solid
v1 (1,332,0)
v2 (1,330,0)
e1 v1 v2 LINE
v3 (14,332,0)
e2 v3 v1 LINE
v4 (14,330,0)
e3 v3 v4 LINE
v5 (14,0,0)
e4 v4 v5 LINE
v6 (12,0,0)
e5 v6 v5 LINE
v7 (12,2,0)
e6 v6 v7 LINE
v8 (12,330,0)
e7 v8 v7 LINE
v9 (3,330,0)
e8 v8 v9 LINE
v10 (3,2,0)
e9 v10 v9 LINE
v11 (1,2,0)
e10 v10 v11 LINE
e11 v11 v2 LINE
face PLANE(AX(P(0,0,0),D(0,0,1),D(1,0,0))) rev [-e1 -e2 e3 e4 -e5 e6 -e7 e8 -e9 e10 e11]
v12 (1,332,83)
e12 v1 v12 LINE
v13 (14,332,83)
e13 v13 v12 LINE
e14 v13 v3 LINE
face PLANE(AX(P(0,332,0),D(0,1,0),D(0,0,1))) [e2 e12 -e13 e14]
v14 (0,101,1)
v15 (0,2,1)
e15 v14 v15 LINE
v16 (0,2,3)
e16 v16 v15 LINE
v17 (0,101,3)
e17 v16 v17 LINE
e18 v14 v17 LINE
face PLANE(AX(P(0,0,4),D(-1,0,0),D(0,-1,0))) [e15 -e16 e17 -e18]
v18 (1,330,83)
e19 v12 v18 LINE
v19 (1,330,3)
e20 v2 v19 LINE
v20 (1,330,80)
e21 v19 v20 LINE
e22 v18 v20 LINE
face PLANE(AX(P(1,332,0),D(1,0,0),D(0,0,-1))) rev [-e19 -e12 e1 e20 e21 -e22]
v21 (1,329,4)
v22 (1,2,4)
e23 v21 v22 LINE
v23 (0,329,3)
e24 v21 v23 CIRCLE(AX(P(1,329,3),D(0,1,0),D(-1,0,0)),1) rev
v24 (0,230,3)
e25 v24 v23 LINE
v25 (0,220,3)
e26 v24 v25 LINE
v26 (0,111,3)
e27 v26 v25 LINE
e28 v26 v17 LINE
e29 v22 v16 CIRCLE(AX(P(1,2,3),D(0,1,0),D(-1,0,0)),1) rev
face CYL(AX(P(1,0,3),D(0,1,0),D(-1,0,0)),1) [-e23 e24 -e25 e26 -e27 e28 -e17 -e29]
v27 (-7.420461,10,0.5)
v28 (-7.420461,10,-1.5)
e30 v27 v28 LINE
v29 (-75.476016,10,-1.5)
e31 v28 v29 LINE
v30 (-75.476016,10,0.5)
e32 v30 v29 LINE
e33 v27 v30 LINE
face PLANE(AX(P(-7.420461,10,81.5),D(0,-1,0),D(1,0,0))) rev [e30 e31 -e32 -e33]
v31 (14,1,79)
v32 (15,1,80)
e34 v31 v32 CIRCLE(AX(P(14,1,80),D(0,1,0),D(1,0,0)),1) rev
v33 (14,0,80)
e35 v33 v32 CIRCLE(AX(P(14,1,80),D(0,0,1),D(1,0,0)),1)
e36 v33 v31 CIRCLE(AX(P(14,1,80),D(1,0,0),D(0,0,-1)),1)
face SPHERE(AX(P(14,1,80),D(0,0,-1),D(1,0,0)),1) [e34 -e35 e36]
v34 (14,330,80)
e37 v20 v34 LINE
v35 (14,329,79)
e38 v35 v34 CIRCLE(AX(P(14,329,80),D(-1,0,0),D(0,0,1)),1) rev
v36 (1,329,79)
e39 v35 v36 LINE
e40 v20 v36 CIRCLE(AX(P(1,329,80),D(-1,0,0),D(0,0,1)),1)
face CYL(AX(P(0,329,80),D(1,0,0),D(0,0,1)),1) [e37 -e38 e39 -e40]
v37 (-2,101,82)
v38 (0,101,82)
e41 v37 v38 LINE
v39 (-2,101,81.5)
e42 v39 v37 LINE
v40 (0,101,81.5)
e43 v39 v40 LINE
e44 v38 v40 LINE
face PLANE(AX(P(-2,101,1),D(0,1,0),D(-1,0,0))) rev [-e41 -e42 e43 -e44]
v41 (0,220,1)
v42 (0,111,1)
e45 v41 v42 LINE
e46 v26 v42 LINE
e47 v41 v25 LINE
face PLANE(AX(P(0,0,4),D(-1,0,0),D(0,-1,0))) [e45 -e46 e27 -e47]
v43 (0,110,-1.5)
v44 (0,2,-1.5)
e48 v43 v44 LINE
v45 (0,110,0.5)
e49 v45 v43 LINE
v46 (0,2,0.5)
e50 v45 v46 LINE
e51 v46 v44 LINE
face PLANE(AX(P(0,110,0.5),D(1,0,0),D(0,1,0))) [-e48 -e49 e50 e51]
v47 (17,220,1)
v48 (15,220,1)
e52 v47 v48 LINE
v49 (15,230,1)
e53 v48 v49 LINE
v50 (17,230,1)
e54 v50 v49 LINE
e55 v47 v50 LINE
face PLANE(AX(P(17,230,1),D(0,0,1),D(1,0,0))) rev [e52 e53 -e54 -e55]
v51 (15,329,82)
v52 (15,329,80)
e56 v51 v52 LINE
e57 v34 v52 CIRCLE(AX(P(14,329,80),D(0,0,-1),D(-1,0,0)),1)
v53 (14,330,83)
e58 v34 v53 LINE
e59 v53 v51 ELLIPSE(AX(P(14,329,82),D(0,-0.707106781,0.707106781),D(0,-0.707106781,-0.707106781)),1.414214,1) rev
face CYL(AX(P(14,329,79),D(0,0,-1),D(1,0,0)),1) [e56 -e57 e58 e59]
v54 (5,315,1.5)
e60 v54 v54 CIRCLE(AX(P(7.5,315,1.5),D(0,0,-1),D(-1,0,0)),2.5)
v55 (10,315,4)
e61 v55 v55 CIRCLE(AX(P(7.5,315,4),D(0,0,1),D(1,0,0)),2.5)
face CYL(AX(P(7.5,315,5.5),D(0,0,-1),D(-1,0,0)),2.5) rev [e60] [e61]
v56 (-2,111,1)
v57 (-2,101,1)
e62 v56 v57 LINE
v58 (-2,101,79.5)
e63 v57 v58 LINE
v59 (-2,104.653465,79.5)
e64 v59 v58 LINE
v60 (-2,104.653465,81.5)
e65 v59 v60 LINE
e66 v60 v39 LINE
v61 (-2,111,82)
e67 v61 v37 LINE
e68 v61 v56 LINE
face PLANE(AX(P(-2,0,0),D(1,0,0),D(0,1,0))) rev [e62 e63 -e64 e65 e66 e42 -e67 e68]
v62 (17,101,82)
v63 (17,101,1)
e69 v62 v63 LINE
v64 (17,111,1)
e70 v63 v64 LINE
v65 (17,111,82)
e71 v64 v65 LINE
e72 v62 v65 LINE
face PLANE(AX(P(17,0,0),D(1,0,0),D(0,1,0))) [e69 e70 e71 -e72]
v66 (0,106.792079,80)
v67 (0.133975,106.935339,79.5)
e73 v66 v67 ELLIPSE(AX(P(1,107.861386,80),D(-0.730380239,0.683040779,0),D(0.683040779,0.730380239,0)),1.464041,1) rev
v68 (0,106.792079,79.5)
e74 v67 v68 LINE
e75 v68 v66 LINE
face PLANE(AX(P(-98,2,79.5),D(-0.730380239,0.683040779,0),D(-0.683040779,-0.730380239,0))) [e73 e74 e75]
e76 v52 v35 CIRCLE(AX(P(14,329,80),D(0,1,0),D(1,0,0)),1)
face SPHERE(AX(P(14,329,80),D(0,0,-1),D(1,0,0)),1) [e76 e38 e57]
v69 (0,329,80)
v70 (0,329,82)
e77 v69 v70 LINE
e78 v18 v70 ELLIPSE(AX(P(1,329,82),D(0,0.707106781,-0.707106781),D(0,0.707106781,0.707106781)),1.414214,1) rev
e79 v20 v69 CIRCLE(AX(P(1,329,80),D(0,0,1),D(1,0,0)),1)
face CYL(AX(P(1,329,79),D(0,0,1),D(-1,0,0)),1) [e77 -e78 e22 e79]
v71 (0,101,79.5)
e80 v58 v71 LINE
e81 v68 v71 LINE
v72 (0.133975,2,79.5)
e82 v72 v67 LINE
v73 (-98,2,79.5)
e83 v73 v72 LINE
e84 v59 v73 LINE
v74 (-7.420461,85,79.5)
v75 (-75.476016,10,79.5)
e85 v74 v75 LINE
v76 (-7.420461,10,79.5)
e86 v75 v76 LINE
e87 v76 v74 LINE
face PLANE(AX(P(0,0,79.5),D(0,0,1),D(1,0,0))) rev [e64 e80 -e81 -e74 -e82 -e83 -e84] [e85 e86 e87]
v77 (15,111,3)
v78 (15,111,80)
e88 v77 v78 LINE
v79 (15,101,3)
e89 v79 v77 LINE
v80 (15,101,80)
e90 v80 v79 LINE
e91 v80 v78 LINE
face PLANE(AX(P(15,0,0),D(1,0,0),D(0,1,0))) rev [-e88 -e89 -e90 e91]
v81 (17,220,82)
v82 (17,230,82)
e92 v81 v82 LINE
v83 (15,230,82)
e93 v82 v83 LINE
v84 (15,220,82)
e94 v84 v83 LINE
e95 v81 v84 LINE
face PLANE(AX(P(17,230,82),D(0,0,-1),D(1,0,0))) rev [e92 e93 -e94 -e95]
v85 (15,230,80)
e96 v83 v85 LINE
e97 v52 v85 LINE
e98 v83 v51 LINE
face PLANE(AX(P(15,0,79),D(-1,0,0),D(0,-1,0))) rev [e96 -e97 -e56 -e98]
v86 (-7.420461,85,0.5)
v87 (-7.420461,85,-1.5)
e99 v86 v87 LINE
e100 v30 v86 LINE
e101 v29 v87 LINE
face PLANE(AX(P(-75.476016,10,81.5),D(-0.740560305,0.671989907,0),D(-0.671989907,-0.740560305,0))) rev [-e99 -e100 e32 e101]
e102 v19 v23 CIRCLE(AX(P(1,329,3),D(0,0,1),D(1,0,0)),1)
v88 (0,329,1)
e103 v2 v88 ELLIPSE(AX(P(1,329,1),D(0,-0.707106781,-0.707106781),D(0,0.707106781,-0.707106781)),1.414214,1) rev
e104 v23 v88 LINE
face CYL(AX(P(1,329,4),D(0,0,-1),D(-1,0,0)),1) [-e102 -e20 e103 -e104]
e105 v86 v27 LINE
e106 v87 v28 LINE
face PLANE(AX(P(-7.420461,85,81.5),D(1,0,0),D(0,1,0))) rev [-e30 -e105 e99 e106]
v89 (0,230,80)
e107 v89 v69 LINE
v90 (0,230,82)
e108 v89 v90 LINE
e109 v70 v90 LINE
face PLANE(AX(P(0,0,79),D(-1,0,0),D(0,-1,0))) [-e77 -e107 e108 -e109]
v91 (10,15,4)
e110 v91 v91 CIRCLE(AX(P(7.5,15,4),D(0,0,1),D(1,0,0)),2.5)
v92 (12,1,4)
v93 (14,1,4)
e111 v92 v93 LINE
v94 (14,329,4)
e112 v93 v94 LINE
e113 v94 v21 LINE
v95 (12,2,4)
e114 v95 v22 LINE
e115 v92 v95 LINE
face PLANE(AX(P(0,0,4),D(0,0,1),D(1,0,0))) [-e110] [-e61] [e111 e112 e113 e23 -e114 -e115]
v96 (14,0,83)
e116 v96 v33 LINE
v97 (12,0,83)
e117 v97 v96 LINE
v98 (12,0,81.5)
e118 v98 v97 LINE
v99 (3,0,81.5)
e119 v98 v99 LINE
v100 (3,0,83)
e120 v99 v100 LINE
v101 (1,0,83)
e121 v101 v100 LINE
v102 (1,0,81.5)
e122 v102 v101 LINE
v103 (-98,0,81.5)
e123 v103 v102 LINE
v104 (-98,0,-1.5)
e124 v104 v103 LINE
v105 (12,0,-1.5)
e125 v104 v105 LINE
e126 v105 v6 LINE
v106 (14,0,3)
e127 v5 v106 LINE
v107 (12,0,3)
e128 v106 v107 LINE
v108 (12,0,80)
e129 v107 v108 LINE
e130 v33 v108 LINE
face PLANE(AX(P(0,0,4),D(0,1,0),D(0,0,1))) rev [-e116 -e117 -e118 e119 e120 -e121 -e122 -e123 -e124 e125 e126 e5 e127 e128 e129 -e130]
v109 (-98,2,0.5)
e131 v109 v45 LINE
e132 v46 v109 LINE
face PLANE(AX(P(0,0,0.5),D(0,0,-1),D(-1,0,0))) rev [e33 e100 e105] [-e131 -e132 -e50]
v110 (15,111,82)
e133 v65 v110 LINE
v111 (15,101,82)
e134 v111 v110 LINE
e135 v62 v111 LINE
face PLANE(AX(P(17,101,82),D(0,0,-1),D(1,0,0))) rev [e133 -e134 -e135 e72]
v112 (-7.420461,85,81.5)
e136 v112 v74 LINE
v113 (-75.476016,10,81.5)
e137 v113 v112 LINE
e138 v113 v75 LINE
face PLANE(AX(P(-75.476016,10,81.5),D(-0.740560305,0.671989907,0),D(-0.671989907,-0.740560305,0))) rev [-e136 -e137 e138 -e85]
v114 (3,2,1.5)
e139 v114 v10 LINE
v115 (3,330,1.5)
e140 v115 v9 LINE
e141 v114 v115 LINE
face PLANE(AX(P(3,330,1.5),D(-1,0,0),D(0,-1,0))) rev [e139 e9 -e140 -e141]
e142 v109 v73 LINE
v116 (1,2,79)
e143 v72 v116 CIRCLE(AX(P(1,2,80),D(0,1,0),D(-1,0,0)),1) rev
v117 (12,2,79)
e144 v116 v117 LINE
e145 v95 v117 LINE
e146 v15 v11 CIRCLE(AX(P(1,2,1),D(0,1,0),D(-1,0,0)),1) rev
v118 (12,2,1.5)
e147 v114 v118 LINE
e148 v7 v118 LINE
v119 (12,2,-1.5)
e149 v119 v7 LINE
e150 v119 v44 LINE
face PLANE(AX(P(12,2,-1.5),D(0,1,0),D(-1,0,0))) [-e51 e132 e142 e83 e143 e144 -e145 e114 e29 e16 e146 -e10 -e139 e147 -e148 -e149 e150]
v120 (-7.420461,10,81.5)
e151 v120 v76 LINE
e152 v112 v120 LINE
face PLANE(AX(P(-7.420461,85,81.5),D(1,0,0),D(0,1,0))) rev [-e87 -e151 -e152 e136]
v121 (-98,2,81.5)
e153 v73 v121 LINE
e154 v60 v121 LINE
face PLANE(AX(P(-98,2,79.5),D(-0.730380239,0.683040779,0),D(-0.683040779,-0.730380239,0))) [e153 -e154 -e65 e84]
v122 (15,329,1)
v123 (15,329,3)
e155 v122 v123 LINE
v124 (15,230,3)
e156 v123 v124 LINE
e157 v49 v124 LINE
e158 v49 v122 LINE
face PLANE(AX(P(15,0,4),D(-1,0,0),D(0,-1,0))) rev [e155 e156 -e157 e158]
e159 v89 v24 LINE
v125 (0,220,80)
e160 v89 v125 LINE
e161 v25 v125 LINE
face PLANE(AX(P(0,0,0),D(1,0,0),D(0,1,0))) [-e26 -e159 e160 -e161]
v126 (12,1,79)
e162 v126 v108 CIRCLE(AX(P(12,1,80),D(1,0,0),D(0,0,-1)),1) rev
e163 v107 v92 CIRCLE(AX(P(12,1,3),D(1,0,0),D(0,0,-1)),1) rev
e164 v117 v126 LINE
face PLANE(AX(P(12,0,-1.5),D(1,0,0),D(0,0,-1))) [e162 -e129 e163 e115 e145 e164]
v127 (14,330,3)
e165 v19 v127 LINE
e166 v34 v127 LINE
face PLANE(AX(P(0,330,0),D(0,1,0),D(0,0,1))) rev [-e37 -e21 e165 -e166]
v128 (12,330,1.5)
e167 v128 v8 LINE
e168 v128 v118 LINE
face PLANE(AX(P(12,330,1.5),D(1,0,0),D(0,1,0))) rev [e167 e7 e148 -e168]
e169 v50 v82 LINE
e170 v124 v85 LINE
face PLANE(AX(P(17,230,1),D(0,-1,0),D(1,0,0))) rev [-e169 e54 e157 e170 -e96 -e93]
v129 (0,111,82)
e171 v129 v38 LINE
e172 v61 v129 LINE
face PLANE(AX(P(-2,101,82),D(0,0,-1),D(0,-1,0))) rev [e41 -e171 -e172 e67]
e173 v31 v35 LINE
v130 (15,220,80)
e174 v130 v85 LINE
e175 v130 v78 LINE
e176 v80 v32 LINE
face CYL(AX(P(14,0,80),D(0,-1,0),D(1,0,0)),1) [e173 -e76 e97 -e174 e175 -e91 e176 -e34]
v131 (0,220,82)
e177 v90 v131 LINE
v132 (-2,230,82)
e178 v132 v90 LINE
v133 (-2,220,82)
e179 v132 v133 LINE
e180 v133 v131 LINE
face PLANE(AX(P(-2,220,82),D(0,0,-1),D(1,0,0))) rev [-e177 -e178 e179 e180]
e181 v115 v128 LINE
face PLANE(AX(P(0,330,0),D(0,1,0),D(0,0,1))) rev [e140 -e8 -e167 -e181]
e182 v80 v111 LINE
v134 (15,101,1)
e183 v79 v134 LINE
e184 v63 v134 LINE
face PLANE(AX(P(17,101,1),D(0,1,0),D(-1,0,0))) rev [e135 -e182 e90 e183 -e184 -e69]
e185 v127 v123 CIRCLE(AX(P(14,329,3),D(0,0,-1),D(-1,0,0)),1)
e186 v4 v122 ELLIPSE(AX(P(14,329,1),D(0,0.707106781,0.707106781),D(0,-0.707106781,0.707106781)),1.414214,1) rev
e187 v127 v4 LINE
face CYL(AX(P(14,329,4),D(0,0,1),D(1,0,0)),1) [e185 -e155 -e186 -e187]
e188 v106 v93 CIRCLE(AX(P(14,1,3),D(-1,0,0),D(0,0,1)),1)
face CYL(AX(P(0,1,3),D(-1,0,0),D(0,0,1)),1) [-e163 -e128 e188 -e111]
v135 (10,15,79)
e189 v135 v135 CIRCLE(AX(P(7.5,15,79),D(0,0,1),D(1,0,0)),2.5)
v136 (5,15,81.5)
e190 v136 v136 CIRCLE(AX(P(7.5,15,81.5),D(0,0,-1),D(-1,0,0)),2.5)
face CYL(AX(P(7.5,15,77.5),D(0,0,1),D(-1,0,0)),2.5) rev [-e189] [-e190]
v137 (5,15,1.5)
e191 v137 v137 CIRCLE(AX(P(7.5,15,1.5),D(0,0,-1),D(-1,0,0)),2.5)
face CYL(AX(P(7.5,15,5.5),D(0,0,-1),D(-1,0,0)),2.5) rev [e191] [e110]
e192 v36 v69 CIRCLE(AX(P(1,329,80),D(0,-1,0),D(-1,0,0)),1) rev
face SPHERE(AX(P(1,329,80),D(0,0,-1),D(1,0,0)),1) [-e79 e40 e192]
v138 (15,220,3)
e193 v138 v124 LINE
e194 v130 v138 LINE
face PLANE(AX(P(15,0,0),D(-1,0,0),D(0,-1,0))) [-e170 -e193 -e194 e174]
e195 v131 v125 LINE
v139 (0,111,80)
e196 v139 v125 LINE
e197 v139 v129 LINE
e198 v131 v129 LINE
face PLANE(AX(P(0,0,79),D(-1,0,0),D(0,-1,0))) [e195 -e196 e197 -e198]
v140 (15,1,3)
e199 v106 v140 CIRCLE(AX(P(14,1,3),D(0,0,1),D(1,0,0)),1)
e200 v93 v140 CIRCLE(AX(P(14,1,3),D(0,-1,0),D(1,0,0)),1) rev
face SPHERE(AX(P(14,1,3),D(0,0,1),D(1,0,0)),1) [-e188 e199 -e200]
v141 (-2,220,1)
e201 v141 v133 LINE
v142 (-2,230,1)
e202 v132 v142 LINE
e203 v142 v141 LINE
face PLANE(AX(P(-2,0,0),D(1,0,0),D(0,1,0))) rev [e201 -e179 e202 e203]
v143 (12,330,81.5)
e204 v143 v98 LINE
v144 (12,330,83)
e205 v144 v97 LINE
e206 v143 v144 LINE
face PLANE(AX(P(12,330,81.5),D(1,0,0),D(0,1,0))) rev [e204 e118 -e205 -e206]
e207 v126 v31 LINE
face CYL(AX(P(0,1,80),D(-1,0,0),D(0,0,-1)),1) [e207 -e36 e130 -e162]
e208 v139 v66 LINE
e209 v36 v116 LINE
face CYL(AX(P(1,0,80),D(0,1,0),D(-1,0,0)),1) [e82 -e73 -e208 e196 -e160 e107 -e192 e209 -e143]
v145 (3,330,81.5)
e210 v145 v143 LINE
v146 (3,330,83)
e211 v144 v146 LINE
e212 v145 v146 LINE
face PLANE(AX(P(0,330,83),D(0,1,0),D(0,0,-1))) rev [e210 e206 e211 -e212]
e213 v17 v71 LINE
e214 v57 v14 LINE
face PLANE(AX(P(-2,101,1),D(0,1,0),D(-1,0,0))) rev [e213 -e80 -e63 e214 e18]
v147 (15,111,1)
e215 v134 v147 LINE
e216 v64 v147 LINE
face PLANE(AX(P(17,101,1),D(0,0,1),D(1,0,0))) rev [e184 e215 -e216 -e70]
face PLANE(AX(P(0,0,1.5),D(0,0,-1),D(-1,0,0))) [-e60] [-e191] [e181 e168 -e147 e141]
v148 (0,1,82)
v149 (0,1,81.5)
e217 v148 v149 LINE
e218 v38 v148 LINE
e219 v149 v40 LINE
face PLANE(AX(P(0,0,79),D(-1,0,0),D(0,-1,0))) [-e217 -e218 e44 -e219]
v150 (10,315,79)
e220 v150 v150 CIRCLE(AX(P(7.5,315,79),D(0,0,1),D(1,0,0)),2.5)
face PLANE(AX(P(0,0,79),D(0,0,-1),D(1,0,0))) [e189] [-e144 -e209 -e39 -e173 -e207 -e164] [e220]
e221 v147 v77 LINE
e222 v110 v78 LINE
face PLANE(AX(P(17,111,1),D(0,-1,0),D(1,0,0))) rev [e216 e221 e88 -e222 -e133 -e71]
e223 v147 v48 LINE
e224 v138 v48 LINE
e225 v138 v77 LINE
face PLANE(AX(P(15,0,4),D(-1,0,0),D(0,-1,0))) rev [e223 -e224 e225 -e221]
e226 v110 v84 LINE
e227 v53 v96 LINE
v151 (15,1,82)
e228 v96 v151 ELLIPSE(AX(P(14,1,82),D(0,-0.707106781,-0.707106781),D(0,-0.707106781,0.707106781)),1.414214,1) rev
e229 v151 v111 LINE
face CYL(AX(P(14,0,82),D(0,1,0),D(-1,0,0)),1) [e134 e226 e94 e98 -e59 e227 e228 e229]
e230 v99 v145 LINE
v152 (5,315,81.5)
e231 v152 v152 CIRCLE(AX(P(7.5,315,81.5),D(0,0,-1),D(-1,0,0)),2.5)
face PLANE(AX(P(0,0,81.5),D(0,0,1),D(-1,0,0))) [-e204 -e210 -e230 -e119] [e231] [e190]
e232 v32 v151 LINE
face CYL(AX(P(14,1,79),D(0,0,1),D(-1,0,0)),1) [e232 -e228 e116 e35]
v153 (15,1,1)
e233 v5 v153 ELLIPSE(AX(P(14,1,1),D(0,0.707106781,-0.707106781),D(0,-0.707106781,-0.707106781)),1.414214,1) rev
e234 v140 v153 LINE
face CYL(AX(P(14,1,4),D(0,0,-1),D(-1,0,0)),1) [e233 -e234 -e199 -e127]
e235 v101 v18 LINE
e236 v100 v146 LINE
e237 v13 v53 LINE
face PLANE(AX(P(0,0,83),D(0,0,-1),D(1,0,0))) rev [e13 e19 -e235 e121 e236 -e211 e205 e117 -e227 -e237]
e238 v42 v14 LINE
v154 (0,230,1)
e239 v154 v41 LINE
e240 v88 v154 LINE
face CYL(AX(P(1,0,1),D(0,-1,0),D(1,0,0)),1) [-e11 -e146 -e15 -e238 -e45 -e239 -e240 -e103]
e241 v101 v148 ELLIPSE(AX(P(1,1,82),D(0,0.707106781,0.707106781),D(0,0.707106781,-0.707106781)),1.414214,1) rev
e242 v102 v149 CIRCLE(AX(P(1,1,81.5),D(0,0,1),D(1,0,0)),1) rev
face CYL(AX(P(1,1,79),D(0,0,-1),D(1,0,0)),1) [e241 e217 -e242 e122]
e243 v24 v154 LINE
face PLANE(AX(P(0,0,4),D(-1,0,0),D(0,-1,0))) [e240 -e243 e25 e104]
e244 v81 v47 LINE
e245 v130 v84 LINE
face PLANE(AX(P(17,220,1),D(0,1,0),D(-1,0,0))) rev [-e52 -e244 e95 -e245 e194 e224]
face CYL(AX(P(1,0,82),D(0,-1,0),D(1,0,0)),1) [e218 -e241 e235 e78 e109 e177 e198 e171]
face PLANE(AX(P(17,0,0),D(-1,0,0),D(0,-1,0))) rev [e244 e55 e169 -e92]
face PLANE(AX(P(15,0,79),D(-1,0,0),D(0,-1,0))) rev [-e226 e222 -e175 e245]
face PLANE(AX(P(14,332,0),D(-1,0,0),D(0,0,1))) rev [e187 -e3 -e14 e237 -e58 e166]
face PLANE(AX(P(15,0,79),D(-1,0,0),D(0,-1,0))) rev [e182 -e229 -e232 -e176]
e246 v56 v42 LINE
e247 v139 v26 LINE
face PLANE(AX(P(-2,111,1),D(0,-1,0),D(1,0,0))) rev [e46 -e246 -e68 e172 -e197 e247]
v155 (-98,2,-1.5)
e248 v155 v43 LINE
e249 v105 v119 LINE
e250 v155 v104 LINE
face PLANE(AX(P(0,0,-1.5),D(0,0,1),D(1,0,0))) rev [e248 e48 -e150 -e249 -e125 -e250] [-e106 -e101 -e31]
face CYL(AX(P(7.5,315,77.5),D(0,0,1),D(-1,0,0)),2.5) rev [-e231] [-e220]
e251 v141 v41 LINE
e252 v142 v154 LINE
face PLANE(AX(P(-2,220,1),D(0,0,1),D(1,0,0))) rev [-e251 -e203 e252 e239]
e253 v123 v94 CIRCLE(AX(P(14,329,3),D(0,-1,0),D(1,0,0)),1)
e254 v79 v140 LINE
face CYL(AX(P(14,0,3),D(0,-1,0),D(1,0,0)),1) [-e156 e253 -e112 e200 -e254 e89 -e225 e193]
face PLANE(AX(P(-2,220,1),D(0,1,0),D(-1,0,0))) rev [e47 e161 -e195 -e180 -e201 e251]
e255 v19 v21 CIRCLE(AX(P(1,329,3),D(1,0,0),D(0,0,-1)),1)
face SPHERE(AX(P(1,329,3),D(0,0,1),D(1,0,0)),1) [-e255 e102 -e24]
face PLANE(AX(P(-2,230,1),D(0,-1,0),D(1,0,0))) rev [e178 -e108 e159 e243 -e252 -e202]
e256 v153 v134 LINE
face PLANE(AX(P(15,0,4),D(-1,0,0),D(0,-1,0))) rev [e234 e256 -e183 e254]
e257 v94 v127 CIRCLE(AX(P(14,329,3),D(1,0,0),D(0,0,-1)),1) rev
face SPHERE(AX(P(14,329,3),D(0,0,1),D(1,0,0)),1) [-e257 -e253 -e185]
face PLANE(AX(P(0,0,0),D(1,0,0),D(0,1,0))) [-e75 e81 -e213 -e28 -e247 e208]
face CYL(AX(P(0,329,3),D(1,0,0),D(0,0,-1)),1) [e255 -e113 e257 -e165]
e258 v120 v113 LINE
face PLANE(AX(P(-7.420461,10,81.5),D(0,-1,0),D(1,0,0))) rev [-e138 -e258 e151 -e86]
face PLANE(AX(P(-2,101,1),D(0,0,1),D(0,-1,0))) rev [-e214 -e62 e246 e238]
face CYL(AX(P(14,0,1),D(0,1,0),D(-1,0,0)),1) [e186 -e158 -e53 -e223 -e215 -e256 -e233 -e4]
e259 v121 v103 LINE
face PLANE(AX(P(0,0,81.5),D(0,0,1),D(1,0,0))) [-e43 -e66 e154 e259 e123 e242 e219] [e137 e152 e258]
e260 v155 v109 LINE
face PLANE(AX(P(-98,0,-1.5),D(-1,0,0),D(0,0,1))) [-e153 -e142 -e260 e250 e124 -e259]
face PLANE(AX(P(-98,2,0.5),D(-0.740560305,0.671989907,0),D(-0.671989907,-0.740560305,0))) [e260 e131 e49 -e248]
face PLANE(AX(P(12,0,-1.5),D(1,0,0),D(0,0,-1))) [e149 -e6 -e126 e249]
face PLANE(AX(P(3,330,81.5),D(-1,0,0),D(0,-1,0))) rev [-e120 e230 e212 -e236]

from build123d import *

# Parameters (mm, degrees)
SKETCH1_W            = 15
SKETCH1_H            = 330
SLIDER_BODY_DEPTH    = 4
SKETCH2_W            = 9
SKETCH2_H            = 330
SLIDER_INDENTS_DEPTH = 1.5
FILLET5_R            = 1
FILLET6_R            = 1
FILLET7_R            = 1
SKETCH3_R            = 2.5
CUT_EXTRUDE2_DEPTH   = 4
SKETCH5_W            = 13
SKETCH5_H            = 41.5
BOSS_EXTRUDE2_DEPTH  = 2
SKETCH7_W            = 40.5
SKETCH7_H            = 10
SKETCH7_W_2          = 41.5
BOSS_EXTRUDE3_DEPTH  = 2
SKETCH9_W            = 40.5
SKETCH9_H            = 10
SKETCH9_W_2          = 41.5
BOSS_EXTRUDE4_DEPTH  = 2
FILLET5_OF_MIRROR4_R = 1
FILLET6_OF_MIRROR4_R = 1
FILLET7_OF_MIRROR4_R = 1
SKETCH11_W           = 110
SKETCH11_H           = 2
BOSS_EXTRUDE5_DEPTH  = 83
BOSS_EXTRUDE6_DEPTH  = 2
BOSS_EXTRUDE7_DEPTH  = 2
CUT_EXTRUDE3_DEPTH   = 83


with BuildPart() as part:
    # Sketch1 → slider_body (new body)
    with BuildSketch(Plane.XY):
        with Locations((7.5, 165)):
            Rectangle(SKETCH1_W, SKETCH1_H)
    slider_body = extrude(amount=SLIDER_BODY_DEPTH)

    # Sketch2 → slider_indents (cut)
    with BuildSketch(Plane(origin=(0, 0, 0), x_dir=(-1, 0, 0), z_dir=(0, 0, -1))):
        with Locations((-7.5, 165)):
            Rectangle(SKETCH2_W, SKETCH2_H)
    slider_indents = extrude(amount=-SLIDER_INDENTS_DEPTH, mode=Mode.SUBTRACT)

    # Fillet5
    fillet5_edges = [part.edges().sort_by_distance(p)[0] for p in [
        (7.5, 330, 4),
        (0, 165, 4),
        (7.5, 0, 4),
        (15, 165, 4),
    ]]
    fillet(fillet5_edges, radius=FILLET5_R)

    # Fillet6
    # the kernel refuses this fillet: 1 mm, written as the material it takes off along each edge
    with BuildSketch(Plane(origin=(1, 1, 3), x_dir=(-1, 0, 0), z_dir=(0, -1, 0))) as fillet6_piece_1_section:
        Polygon((0, 0), (FILLET6_R, 0), (FILLET6_R, -FILLET6_R), (0, -FILLET6_R), align=None)
    fillet6_piece_1 = extrude(amount=FILLET6_R, mode=Mode.PRIVATE)
    fillet6_piece_1 = fillet6_piece_1 - Plane(origin=(1, 1, 3), x_dir=(0.7071067811865475, 0, -0.7071067811865475), z_dir=(0, -1, 0)) * Sphere(FILLET6_R, mode=Mode.PRIVATE)
    add(fillet6_piece_1, mode=Mode.SUBTRACT)
    with BuildSketch(Plane(origin=(1, 329, 3), x_dir=(0, 1, 0), z_dir=(-1, 0, 0))) as fillet6_piece_2_section:
        Polygon((0, 0), (FILLET6_R, 0), (FILLET6_R, -FILLET6_R), (0, -FILLET6_R), align=None)
    fillet6_piece_2 = extrude(amount=FILLET6_R, mode=Mode.PRIVATE)
    fillet6_piece_2 = fillet6_piece_2 - Plane(origin=(1, 329, 3), x_dir=(0, -0.7071067811865475, -0.7071067811865475), z_dir=(-1, 0, 0)) * Sphere(FILLET6_R, mode=Mode.PRIVATE)
    add(fillet6_piece_2, mode=Mode.SUBTRACT)
    with BuildSketch(Plane(origin=(0, 0, -2.5), x_dir=(1, 0, 0), z_dir=(0, 0, 1)), Plane(origin=(0, 330, -2.5), x_dir=(0, -1, 0), z_dir=(0, 0, 1))) as fillet6_piece_3:
        with BuildLine():
            CenterArc((FILLET6_R, FILLET6_R), FILLET6_R, 180, 90)
            Line((0, FILLET6_R), (0, 0))
            Line((0, 0), (FILLET6_R, 0))
        make_face()
    extrude(amount=5.5, mode=Mode.SUBTRACT)
    with BuildSketch(Plane(origin=(0, 332.5, 0), x_dir=(0, 0, 1), z_dir=(0, -1, 0))) as fillet6_piece_4:
        with BuildLine():
            CenterArc((FILLET6_R, -FILLET6_R), FILLET6_R, 90, 90)
            Line((0, -FILLET6_R), (0, 0))
            Line((0, 0), (FILLET6_R, 0))
        make_face()
    extrude(amount=335, mode=Mode.SUBTRACT)

    # Fillet7
    # the kernel refuses this fillet: 1 mm, written as the material it takes off along each edge
    with BuildSketch(Plane(origin=(14, 1, 3), x_dir=(1, 0, 0), z_dir=(0, -1, 0))) as fillet7_piece_1_section:
        Polygon((0, 0), (FILLET7_R, 0), (FILLET7_R, FILLET7_R), (0, FILLET7_R), align=None)
    fillet7_piece_1 = extrude(amount=FILLET7_R, mode=Mode.PRIVATE)
    fillet7_piece_1 = fillet7_piece_1 - Plane(origin=(14, 1, 3), x_dir=(-0.7071067811865475, 0, -0.7071067811865475), z_dir=(0, -1, 0)) * Sphere(FILLET7_R, mode=Mode.PRIVATE)
    add(fillet7_piece_1, mode=Mode.SUBTRACT)
    with BuildSketch(Plane(origin=(14, 329, 3), x_dir=(0, 1, 0), z_dir=(1, 0, 0))) as fillet7_piece_2_section:
        Polygon((0, 0), (FILLET7_R, 0), (FILLET7_R, FILLET7_R), (0, FILLET7_R), align=None)
    fillet7_piece_2 = extrude(amount=FILLET7_R, mode=Mode.PRIVATE)
    fillet7_piece_2 = fillet7_piece_2 - Plane(origin=(14, 329, 3), x_dir=(0, -0.7071067811865475, -0.7071067811865475), z_dir=(1, 0, 0)) * Sphere(FILLET7_R, mode=Mode.PRIVATE)
    add(fillet7_piece_2, mode=Mode.SUBTRACT)
    with BuildSketch(Plane(origin=(15, 330, -2.5), x_dir=(0, -1, 0), z_dir=(0, 0, 1)), Plane(origin=(15, 0, -2.5), x_dir=(-1, 0, 0), z_dir=(0, 0, 1))) as fillet7_piece_3:
        with BuildLine():
            CenterArc((FILLET7_R, -FILLET7_R), FILLET7_R, 90, 90)
            Line((0, -FILLET7_R), (0, 0))
            Line((0, 0), (FILLET7_R, 0))
        make_face()
    extrude(amount=5.5, mode=Mode.SUBTRACT)
    with BuildSketch(Plane(origin=(15, -2.5, 0), x_dir=(-1, 0, 0), z_dir=(0, 1, 0))) as fillet7_piece_4:
        with BuildLine():
            CenterArc((FILLET7_R, FILLET7_R), FILLET7_R, 180, 90)
            Line((0, FILLET7_R), (0, 0))
            Line((0, 0), (FILLET7_R, 0))
        make_face()
    extrude(amount=335, mode=Mode.SUBTRACT)

    # Sketch3 → Cut-Extrude2 (cut)
    with BuildSketch(Plane(origin=(0, 0, 1.5), x_dir=(-1, 0, 0), z_dir=(0, 0, -1))):
        with Locations((-7.5, 315)):
            Circle(SKETCH3_R)
        with Locations((-7.5, 15)):
            Circle(SKETCH3_R)
    cut_extrude2 = extrude(amount=-CUT_EXTRUDE2_DEPTH, mode=Mode.SUBTRACT)

    # Sketch5 → Boss-Extrude2 (add)
    with BuildSketch(Plane(origin=(0, 330, 0), x_dir=(1, 0, 0), z_dir=(0, 1, 0))):
        with Locations((7.5, -20.75)):
            Rectangle(SKETCH5_W, SKETCH5_H)
    boss_extrude2 = extrude(amount=BOSS_EXTRUDE2_DEPTH)

    # Sketch7 → Boss-Extrude3 (add)
    with BuildSketch(Plane.ZY):
        with Locations((21.25, 225)):
            Rectangle(SKETCH7_W, SKETCH7_H)
        with Locations((21.75, 106)):
            Rectangle(SKETCH7_W_2, SKETCH7_H)
    boss_extrude3 = extrude(amount=BOSS_EXTRUDE3_DEPTH)

    # Sketch9 → Boss-Extrude4 (add)
    with BuildSketch(Plane(origin=(15, 0, 0), x_dir=(0, 0, -1), z_dir=(1, 0, 0))):
        with Locations((-21.25, 225)):
            Rectangle(SKETCH9_W, SKETCH9_H)
        with Locations((-21.75, 106)):
            Rectangle(SKETCH9_W_2, SKETCH9_H)
    boss_extrude4 = extrude(amount=BOSS_EXTRUDE4_DEPTH)


with BuildPart() as mirror4_1:
    # Mirror4: slider_body across plane
    add(slider_body.mirror(Plane(origin=(1, 332, 41.5), x_dir=(1, 0, 0), z_dir=(0, 0, -1))))

    # Mirror4 2: slider_indents, Cut-Extrude2 across plane
    add(slider_indents.mirror(Plane(origin=(1, 332, 41.5), x_dir=(1, 0, 0), z_dir=(0, 0, -1))), mode=Mode.SUBTRACT)
    add(cut_extrude2.mirror(Plane(origin=(1, 332, 41.5), x_dir=(1, 0, 0), z_dir=(0, 0, -1))), mode=Mode.SUBTRACT)

    # Fillet5 of Mirror4
    fillet5_of_mirror4_edges = [mirror4_1.edges().sort_by_distance(p)[0] for p in [
        (7.5, 330, 79),
        (0, 165, 79),
        (7.5, 0, 79),
        (15, 165, 79),
    ]]
    fillet(fillet5_of_mirror4_edges, radius=FILLET5_OF_MIRROR4_R)

    # Fillet6 of Mirror4
    # the kernel refuses this fillet: 1 mm, written as the material it takes off along each edge
    with BuildSketch(Plane(origin=(1, 1, 80), x_dir=(-1, 0, 0), z_dir=(0, -1, 0))) as fillet6_of_mirror4_piece_1_section:
        Polygon((0, 0), (FILLET6_OF_MIRROR4_R, 0), (FILLET6_OF_MIRROR4_R, FILLET6_OF_MIRROR4_R), (0, FILLET6_OF_MIRROR4_R), align=None)
    fillet6_of_mirror4_piece_1 = extrude(amount=FILLET6_OF_MIRROR4_R, mode=Mode.PRIVATE)
    fillet6_of_mirror4_piece_1 = fillet6_of_mirror4_piece_1 - Plane(origin=(1, 1, 80), x_dir=(0.7071067811865475, 0, 0.7071067811865475), z_dir=(0, -1, 0)) * Sphere(FILLET6_OF_MIRROR4_R, mode=Mode.PRIVATE)
    add(fillet6_of_mirror4_piece_1, mode=Mode.SUBTRACT)
    with BuildSketch(Plane(origin=(1, 329, 80), x_dir=(0, 1, 0), z_dir=(-1, 0, 0))) as fillet6_of_mirror4_piece_2_section:
        Polygon((0, 0), (FILLET6_OF_MIRROR4_R, 0), (FILLET6_OF_MIRROR4_R, FILLET6_OF_MIRROR4_R), (0, FILLET6_OF_MIRROR4_R), align=None)
    fillet6_of_mirror4_piece_2 = extrude(amount=FILLET6_OF_MIRROR4_R, mode=Mode.PRIVATE)
    fillet6_of_mirror4_piece_2 = fillet6_of_mirror4_piece_2 - Plane(origin=(1, 329, 80), x_dir=(0, -0.7071067811865475, 0.7071067811865475), z_dir=(-1, 0, 0)) * Sphere(FILLET6_OF_MIRROR4_R, mode=Mode.PRIVATE)
    add(fillet6_of_mirror4_piece_2, mode=Mode.SUBTRACT)
    with BuildSketch(Plane(origin=(0, 0, 85.5), x_dir=(1, 0, 0), z_dir=(0, 0, -1)), Plane(origin=(0, 330, 85.5), x_dir=(0, -1, 0), z_dir=(0, 0, -1))) as fillet6_of_mirror4_piece_3:
        with BuildLine():
            CenterArc((FILLET6_OF_MIRROR4_R, -FILLET6_OF_MIRROR4_R), FILLET6_OF_MIRROR4_R, 90, 90)
            Line((0, -FILLET6_OF_MIRROR4_R), (0, 0))
            Line((0, 0), (FILLET6_OF_MIRROR4_R, 0))
        make_face()
    extrude(amount=5.5, mode=Mode.SUBTRACT)
    with BuildSketch(Plane(origin=(0, 332.5, 83), x_dir=(0, 0, -1), z_dir=(0, -1, 0))) as fillet6_of_mirror4_piece_4:
        with BuildLine():
            CenterArc((FILLET6_OF_MIRROR4_R, FILLET6_OF_MIRROR4_R), FILLET6_OF_MIRROR4_R, 180, 90)
            Line((0, FILLET6_OF_MIRROR4_R), (0, 0))
            Line((0, 0), (FILLET6_OF_MIRROR4_R, 0))
        make_face()
    extrude(amount=335, mode=Mode.SUBTRACT)

    # Fillet7 of Mirror4
    # the kernel refuses this fillet: 1 mm, written as the material it takes off along each edge
    with BuildSketch(Plane(origin=(14, 1, 80), x_dir=(1, 0, 0), z_dir=(0, -1, 0))) as fillet7_of_mirror4_piece_1_section:
        Polygon((0, 0), (FILLET7_OF_MIRROR4_R, 0), (FILLET7_OF_MIRROR4_R, -FILLET7_OF_MIRROR4_R), (0, -FILLET7_OF_MIRROR4_R), align=None)
    fillet7_of_mirror4_piece_1 = extrude(amount=FILLET7_OF_MIRROR4_R, mode=Mode.PRIVATE)
    fillet7_of_mirror4_piece_1 = fillet7_of_mirror4_piece_1 - Plane(origin=(14, 1, 80), x_dir=(-0.7071067811865475, 0, 0.7071067811865475), z_dir=(0, -1, 0)) * Sphere(FILLET7_OF_MIRROR4_R, mode=Mode.PRIVATE)
    add(fillet7_of_mirror4_piece_1, mode=Mode.SUBTRACT)
    with BuildSketch(Plane(origin=(14, 329, 80), x_dir=(0, 1, 0), z_dir=(1, 0, 0))) as fillet7_of_mirror4_piece_2_section:
        Polygon((0, 0), (FILLET7_OF_MIRROR4_R, 0), (FILLET7_OF_MIRROR4_R, -FILLET7_OF_MIRROR4_R), (0, -FILLET7_OF_MIRROR4_R), align=None)
    fillet7_of_mirror4_piece_2 = extrude(amount=FILLET7_OF_MIRROR4_R, mode=Mode.PRIVATE)
    fillet7_of_mirror4_piece_2 = fillet7_of_mirror4_piece_2 - Plane(origin=(14, 329, 80), x_dir=(0, -0.7071067811865475, 0.7071067811865475), z_dir=(1, 0, 0)) * Sphere(FILLET7_OF_MIRROR4_R, mode=Mode.PRIVATE)
    add(fillet7_of_mirror4_piece_2, mode=Mode.SUBTRACT)
    with BuildSketch(Plane(origin=(15, 330, 85.5), x_dir=(0, -1, 0), z_dir=(0, 0, -1)), Plane(origin=(15, 0, 85.5), x_dir=(-1, 0, 0), z_dir=(0, 0, -1))) as fillet7_of_mirror4_piece_3:
        with BuildLine():
            CenterArc((FILLET7_OF_MIRROR4_R, FILLET7_OF_MIRROR4_R), FILLET7_OF_MIRROR4_R, 180, 90)
            Line((0, FILLET7_OF_MIRROR4_R), (0, 0))
            Line((0, 0), (FILLET7_OF_MIRROR4_R, 0))
        make_face()
    extrude(amount=5.5, mode=Mode.SUBTRACT)
    with BuildSketch(Plane(origin=(15, -2.5, 83), x_dir=(-1, 0, 0), z_dir=(0, 1, 0))) as fillet7_of_mirror4_piece_4:
        with BuildLine():
            CenterArc((FILLET7_OF_MIRROR4_R, -FILLET7_OF_MIRROR4_R), FILLET7_OF_MIRROR4_R, 90, 90)
            Line((0, -FILLET7_OF_MIRROR4_R), (0, 0))
            Line((0, 0), (FILLET7_OF_MIRROR4_R, 0))
        make_face()
    extrude(amount=335, mode=Mode.SUBTRACT)


with BuildPart() as mirror4_3_1:
    # Mirror4 3: Boss-Extrude2, Boss-Extrude3, Boss-Extrude4 across plane
    add(boss_extrude2.mirror(Plane(origin=(1, 332, 41.5), x_dir=(1, 0, 0), z_dir=(0, 0, -1))))
    add(boss_extrude3.mirror(Plane(origin=(1, 332, 41.5), x_dir=(1, 0, 0), z_dir=(0, 0, -1))))
    add(boss_extrude4.mirror(Plane(origin=(1, 332, 41.5), x_dir=(1, 0, 0), z_dir=(0, 0, -1))))


with BuildPart() as part_1:
    add(part.part)

    # Mirror4 united with what the copies touc: union Mirror4_1, Mirror4 3_1
    add(mirror4_1.part)
    add(mirror4_3_1.part)

    # Sketch11 → Boss-Extrude5 (add)
    with BuildSketch(Plane.XY.offset(81.5)):
        with Locations((-43, 1)):
            Rectangle(SKETCH11_W, SKETCH11_H)
    extrude(amount=-BOSS_EXTRUDE5_DEPTH)

    # Sketch13 → Boss-Extrude6 (add)
    with BuildSketch(Plane.XY.offset(81.5)):
        Polygon((-98, 2), (3, 110), (3, 0), (-98, 0), align=None)
    extrude(amount=-BOSS_EXTRUDE6_DEPTH)

    # Sketch14 → Boss-Extrude7 (add)
    with BuildSketch(Plane(origin=(0, 0, -1.5), x_dir=(-1, 0, 0), z_dir=(0, 0, -1))):
        Polygon((98, 0), (98, 2), (0, 110), (0, 0), align=None)
    extrude(amount=-BOSS_EXTRUDE7_DEPTH)

    # Sketch16 → Cut-Extrude3 (cut)
    with BuildSketch(Plane(origin=(0, 0, -1.5), x_dir=(-1, 0, 0), z_dir=(0, 0, -1))):
        Polygon((7.420460665, 85), (7.420460665, 10), (75.476016221, 10), align=None)
    extrude(amount=-CUT_EXTRUDE3_DEPTH, mode=Mode.SUBTRACT)


solid = part_1.part
